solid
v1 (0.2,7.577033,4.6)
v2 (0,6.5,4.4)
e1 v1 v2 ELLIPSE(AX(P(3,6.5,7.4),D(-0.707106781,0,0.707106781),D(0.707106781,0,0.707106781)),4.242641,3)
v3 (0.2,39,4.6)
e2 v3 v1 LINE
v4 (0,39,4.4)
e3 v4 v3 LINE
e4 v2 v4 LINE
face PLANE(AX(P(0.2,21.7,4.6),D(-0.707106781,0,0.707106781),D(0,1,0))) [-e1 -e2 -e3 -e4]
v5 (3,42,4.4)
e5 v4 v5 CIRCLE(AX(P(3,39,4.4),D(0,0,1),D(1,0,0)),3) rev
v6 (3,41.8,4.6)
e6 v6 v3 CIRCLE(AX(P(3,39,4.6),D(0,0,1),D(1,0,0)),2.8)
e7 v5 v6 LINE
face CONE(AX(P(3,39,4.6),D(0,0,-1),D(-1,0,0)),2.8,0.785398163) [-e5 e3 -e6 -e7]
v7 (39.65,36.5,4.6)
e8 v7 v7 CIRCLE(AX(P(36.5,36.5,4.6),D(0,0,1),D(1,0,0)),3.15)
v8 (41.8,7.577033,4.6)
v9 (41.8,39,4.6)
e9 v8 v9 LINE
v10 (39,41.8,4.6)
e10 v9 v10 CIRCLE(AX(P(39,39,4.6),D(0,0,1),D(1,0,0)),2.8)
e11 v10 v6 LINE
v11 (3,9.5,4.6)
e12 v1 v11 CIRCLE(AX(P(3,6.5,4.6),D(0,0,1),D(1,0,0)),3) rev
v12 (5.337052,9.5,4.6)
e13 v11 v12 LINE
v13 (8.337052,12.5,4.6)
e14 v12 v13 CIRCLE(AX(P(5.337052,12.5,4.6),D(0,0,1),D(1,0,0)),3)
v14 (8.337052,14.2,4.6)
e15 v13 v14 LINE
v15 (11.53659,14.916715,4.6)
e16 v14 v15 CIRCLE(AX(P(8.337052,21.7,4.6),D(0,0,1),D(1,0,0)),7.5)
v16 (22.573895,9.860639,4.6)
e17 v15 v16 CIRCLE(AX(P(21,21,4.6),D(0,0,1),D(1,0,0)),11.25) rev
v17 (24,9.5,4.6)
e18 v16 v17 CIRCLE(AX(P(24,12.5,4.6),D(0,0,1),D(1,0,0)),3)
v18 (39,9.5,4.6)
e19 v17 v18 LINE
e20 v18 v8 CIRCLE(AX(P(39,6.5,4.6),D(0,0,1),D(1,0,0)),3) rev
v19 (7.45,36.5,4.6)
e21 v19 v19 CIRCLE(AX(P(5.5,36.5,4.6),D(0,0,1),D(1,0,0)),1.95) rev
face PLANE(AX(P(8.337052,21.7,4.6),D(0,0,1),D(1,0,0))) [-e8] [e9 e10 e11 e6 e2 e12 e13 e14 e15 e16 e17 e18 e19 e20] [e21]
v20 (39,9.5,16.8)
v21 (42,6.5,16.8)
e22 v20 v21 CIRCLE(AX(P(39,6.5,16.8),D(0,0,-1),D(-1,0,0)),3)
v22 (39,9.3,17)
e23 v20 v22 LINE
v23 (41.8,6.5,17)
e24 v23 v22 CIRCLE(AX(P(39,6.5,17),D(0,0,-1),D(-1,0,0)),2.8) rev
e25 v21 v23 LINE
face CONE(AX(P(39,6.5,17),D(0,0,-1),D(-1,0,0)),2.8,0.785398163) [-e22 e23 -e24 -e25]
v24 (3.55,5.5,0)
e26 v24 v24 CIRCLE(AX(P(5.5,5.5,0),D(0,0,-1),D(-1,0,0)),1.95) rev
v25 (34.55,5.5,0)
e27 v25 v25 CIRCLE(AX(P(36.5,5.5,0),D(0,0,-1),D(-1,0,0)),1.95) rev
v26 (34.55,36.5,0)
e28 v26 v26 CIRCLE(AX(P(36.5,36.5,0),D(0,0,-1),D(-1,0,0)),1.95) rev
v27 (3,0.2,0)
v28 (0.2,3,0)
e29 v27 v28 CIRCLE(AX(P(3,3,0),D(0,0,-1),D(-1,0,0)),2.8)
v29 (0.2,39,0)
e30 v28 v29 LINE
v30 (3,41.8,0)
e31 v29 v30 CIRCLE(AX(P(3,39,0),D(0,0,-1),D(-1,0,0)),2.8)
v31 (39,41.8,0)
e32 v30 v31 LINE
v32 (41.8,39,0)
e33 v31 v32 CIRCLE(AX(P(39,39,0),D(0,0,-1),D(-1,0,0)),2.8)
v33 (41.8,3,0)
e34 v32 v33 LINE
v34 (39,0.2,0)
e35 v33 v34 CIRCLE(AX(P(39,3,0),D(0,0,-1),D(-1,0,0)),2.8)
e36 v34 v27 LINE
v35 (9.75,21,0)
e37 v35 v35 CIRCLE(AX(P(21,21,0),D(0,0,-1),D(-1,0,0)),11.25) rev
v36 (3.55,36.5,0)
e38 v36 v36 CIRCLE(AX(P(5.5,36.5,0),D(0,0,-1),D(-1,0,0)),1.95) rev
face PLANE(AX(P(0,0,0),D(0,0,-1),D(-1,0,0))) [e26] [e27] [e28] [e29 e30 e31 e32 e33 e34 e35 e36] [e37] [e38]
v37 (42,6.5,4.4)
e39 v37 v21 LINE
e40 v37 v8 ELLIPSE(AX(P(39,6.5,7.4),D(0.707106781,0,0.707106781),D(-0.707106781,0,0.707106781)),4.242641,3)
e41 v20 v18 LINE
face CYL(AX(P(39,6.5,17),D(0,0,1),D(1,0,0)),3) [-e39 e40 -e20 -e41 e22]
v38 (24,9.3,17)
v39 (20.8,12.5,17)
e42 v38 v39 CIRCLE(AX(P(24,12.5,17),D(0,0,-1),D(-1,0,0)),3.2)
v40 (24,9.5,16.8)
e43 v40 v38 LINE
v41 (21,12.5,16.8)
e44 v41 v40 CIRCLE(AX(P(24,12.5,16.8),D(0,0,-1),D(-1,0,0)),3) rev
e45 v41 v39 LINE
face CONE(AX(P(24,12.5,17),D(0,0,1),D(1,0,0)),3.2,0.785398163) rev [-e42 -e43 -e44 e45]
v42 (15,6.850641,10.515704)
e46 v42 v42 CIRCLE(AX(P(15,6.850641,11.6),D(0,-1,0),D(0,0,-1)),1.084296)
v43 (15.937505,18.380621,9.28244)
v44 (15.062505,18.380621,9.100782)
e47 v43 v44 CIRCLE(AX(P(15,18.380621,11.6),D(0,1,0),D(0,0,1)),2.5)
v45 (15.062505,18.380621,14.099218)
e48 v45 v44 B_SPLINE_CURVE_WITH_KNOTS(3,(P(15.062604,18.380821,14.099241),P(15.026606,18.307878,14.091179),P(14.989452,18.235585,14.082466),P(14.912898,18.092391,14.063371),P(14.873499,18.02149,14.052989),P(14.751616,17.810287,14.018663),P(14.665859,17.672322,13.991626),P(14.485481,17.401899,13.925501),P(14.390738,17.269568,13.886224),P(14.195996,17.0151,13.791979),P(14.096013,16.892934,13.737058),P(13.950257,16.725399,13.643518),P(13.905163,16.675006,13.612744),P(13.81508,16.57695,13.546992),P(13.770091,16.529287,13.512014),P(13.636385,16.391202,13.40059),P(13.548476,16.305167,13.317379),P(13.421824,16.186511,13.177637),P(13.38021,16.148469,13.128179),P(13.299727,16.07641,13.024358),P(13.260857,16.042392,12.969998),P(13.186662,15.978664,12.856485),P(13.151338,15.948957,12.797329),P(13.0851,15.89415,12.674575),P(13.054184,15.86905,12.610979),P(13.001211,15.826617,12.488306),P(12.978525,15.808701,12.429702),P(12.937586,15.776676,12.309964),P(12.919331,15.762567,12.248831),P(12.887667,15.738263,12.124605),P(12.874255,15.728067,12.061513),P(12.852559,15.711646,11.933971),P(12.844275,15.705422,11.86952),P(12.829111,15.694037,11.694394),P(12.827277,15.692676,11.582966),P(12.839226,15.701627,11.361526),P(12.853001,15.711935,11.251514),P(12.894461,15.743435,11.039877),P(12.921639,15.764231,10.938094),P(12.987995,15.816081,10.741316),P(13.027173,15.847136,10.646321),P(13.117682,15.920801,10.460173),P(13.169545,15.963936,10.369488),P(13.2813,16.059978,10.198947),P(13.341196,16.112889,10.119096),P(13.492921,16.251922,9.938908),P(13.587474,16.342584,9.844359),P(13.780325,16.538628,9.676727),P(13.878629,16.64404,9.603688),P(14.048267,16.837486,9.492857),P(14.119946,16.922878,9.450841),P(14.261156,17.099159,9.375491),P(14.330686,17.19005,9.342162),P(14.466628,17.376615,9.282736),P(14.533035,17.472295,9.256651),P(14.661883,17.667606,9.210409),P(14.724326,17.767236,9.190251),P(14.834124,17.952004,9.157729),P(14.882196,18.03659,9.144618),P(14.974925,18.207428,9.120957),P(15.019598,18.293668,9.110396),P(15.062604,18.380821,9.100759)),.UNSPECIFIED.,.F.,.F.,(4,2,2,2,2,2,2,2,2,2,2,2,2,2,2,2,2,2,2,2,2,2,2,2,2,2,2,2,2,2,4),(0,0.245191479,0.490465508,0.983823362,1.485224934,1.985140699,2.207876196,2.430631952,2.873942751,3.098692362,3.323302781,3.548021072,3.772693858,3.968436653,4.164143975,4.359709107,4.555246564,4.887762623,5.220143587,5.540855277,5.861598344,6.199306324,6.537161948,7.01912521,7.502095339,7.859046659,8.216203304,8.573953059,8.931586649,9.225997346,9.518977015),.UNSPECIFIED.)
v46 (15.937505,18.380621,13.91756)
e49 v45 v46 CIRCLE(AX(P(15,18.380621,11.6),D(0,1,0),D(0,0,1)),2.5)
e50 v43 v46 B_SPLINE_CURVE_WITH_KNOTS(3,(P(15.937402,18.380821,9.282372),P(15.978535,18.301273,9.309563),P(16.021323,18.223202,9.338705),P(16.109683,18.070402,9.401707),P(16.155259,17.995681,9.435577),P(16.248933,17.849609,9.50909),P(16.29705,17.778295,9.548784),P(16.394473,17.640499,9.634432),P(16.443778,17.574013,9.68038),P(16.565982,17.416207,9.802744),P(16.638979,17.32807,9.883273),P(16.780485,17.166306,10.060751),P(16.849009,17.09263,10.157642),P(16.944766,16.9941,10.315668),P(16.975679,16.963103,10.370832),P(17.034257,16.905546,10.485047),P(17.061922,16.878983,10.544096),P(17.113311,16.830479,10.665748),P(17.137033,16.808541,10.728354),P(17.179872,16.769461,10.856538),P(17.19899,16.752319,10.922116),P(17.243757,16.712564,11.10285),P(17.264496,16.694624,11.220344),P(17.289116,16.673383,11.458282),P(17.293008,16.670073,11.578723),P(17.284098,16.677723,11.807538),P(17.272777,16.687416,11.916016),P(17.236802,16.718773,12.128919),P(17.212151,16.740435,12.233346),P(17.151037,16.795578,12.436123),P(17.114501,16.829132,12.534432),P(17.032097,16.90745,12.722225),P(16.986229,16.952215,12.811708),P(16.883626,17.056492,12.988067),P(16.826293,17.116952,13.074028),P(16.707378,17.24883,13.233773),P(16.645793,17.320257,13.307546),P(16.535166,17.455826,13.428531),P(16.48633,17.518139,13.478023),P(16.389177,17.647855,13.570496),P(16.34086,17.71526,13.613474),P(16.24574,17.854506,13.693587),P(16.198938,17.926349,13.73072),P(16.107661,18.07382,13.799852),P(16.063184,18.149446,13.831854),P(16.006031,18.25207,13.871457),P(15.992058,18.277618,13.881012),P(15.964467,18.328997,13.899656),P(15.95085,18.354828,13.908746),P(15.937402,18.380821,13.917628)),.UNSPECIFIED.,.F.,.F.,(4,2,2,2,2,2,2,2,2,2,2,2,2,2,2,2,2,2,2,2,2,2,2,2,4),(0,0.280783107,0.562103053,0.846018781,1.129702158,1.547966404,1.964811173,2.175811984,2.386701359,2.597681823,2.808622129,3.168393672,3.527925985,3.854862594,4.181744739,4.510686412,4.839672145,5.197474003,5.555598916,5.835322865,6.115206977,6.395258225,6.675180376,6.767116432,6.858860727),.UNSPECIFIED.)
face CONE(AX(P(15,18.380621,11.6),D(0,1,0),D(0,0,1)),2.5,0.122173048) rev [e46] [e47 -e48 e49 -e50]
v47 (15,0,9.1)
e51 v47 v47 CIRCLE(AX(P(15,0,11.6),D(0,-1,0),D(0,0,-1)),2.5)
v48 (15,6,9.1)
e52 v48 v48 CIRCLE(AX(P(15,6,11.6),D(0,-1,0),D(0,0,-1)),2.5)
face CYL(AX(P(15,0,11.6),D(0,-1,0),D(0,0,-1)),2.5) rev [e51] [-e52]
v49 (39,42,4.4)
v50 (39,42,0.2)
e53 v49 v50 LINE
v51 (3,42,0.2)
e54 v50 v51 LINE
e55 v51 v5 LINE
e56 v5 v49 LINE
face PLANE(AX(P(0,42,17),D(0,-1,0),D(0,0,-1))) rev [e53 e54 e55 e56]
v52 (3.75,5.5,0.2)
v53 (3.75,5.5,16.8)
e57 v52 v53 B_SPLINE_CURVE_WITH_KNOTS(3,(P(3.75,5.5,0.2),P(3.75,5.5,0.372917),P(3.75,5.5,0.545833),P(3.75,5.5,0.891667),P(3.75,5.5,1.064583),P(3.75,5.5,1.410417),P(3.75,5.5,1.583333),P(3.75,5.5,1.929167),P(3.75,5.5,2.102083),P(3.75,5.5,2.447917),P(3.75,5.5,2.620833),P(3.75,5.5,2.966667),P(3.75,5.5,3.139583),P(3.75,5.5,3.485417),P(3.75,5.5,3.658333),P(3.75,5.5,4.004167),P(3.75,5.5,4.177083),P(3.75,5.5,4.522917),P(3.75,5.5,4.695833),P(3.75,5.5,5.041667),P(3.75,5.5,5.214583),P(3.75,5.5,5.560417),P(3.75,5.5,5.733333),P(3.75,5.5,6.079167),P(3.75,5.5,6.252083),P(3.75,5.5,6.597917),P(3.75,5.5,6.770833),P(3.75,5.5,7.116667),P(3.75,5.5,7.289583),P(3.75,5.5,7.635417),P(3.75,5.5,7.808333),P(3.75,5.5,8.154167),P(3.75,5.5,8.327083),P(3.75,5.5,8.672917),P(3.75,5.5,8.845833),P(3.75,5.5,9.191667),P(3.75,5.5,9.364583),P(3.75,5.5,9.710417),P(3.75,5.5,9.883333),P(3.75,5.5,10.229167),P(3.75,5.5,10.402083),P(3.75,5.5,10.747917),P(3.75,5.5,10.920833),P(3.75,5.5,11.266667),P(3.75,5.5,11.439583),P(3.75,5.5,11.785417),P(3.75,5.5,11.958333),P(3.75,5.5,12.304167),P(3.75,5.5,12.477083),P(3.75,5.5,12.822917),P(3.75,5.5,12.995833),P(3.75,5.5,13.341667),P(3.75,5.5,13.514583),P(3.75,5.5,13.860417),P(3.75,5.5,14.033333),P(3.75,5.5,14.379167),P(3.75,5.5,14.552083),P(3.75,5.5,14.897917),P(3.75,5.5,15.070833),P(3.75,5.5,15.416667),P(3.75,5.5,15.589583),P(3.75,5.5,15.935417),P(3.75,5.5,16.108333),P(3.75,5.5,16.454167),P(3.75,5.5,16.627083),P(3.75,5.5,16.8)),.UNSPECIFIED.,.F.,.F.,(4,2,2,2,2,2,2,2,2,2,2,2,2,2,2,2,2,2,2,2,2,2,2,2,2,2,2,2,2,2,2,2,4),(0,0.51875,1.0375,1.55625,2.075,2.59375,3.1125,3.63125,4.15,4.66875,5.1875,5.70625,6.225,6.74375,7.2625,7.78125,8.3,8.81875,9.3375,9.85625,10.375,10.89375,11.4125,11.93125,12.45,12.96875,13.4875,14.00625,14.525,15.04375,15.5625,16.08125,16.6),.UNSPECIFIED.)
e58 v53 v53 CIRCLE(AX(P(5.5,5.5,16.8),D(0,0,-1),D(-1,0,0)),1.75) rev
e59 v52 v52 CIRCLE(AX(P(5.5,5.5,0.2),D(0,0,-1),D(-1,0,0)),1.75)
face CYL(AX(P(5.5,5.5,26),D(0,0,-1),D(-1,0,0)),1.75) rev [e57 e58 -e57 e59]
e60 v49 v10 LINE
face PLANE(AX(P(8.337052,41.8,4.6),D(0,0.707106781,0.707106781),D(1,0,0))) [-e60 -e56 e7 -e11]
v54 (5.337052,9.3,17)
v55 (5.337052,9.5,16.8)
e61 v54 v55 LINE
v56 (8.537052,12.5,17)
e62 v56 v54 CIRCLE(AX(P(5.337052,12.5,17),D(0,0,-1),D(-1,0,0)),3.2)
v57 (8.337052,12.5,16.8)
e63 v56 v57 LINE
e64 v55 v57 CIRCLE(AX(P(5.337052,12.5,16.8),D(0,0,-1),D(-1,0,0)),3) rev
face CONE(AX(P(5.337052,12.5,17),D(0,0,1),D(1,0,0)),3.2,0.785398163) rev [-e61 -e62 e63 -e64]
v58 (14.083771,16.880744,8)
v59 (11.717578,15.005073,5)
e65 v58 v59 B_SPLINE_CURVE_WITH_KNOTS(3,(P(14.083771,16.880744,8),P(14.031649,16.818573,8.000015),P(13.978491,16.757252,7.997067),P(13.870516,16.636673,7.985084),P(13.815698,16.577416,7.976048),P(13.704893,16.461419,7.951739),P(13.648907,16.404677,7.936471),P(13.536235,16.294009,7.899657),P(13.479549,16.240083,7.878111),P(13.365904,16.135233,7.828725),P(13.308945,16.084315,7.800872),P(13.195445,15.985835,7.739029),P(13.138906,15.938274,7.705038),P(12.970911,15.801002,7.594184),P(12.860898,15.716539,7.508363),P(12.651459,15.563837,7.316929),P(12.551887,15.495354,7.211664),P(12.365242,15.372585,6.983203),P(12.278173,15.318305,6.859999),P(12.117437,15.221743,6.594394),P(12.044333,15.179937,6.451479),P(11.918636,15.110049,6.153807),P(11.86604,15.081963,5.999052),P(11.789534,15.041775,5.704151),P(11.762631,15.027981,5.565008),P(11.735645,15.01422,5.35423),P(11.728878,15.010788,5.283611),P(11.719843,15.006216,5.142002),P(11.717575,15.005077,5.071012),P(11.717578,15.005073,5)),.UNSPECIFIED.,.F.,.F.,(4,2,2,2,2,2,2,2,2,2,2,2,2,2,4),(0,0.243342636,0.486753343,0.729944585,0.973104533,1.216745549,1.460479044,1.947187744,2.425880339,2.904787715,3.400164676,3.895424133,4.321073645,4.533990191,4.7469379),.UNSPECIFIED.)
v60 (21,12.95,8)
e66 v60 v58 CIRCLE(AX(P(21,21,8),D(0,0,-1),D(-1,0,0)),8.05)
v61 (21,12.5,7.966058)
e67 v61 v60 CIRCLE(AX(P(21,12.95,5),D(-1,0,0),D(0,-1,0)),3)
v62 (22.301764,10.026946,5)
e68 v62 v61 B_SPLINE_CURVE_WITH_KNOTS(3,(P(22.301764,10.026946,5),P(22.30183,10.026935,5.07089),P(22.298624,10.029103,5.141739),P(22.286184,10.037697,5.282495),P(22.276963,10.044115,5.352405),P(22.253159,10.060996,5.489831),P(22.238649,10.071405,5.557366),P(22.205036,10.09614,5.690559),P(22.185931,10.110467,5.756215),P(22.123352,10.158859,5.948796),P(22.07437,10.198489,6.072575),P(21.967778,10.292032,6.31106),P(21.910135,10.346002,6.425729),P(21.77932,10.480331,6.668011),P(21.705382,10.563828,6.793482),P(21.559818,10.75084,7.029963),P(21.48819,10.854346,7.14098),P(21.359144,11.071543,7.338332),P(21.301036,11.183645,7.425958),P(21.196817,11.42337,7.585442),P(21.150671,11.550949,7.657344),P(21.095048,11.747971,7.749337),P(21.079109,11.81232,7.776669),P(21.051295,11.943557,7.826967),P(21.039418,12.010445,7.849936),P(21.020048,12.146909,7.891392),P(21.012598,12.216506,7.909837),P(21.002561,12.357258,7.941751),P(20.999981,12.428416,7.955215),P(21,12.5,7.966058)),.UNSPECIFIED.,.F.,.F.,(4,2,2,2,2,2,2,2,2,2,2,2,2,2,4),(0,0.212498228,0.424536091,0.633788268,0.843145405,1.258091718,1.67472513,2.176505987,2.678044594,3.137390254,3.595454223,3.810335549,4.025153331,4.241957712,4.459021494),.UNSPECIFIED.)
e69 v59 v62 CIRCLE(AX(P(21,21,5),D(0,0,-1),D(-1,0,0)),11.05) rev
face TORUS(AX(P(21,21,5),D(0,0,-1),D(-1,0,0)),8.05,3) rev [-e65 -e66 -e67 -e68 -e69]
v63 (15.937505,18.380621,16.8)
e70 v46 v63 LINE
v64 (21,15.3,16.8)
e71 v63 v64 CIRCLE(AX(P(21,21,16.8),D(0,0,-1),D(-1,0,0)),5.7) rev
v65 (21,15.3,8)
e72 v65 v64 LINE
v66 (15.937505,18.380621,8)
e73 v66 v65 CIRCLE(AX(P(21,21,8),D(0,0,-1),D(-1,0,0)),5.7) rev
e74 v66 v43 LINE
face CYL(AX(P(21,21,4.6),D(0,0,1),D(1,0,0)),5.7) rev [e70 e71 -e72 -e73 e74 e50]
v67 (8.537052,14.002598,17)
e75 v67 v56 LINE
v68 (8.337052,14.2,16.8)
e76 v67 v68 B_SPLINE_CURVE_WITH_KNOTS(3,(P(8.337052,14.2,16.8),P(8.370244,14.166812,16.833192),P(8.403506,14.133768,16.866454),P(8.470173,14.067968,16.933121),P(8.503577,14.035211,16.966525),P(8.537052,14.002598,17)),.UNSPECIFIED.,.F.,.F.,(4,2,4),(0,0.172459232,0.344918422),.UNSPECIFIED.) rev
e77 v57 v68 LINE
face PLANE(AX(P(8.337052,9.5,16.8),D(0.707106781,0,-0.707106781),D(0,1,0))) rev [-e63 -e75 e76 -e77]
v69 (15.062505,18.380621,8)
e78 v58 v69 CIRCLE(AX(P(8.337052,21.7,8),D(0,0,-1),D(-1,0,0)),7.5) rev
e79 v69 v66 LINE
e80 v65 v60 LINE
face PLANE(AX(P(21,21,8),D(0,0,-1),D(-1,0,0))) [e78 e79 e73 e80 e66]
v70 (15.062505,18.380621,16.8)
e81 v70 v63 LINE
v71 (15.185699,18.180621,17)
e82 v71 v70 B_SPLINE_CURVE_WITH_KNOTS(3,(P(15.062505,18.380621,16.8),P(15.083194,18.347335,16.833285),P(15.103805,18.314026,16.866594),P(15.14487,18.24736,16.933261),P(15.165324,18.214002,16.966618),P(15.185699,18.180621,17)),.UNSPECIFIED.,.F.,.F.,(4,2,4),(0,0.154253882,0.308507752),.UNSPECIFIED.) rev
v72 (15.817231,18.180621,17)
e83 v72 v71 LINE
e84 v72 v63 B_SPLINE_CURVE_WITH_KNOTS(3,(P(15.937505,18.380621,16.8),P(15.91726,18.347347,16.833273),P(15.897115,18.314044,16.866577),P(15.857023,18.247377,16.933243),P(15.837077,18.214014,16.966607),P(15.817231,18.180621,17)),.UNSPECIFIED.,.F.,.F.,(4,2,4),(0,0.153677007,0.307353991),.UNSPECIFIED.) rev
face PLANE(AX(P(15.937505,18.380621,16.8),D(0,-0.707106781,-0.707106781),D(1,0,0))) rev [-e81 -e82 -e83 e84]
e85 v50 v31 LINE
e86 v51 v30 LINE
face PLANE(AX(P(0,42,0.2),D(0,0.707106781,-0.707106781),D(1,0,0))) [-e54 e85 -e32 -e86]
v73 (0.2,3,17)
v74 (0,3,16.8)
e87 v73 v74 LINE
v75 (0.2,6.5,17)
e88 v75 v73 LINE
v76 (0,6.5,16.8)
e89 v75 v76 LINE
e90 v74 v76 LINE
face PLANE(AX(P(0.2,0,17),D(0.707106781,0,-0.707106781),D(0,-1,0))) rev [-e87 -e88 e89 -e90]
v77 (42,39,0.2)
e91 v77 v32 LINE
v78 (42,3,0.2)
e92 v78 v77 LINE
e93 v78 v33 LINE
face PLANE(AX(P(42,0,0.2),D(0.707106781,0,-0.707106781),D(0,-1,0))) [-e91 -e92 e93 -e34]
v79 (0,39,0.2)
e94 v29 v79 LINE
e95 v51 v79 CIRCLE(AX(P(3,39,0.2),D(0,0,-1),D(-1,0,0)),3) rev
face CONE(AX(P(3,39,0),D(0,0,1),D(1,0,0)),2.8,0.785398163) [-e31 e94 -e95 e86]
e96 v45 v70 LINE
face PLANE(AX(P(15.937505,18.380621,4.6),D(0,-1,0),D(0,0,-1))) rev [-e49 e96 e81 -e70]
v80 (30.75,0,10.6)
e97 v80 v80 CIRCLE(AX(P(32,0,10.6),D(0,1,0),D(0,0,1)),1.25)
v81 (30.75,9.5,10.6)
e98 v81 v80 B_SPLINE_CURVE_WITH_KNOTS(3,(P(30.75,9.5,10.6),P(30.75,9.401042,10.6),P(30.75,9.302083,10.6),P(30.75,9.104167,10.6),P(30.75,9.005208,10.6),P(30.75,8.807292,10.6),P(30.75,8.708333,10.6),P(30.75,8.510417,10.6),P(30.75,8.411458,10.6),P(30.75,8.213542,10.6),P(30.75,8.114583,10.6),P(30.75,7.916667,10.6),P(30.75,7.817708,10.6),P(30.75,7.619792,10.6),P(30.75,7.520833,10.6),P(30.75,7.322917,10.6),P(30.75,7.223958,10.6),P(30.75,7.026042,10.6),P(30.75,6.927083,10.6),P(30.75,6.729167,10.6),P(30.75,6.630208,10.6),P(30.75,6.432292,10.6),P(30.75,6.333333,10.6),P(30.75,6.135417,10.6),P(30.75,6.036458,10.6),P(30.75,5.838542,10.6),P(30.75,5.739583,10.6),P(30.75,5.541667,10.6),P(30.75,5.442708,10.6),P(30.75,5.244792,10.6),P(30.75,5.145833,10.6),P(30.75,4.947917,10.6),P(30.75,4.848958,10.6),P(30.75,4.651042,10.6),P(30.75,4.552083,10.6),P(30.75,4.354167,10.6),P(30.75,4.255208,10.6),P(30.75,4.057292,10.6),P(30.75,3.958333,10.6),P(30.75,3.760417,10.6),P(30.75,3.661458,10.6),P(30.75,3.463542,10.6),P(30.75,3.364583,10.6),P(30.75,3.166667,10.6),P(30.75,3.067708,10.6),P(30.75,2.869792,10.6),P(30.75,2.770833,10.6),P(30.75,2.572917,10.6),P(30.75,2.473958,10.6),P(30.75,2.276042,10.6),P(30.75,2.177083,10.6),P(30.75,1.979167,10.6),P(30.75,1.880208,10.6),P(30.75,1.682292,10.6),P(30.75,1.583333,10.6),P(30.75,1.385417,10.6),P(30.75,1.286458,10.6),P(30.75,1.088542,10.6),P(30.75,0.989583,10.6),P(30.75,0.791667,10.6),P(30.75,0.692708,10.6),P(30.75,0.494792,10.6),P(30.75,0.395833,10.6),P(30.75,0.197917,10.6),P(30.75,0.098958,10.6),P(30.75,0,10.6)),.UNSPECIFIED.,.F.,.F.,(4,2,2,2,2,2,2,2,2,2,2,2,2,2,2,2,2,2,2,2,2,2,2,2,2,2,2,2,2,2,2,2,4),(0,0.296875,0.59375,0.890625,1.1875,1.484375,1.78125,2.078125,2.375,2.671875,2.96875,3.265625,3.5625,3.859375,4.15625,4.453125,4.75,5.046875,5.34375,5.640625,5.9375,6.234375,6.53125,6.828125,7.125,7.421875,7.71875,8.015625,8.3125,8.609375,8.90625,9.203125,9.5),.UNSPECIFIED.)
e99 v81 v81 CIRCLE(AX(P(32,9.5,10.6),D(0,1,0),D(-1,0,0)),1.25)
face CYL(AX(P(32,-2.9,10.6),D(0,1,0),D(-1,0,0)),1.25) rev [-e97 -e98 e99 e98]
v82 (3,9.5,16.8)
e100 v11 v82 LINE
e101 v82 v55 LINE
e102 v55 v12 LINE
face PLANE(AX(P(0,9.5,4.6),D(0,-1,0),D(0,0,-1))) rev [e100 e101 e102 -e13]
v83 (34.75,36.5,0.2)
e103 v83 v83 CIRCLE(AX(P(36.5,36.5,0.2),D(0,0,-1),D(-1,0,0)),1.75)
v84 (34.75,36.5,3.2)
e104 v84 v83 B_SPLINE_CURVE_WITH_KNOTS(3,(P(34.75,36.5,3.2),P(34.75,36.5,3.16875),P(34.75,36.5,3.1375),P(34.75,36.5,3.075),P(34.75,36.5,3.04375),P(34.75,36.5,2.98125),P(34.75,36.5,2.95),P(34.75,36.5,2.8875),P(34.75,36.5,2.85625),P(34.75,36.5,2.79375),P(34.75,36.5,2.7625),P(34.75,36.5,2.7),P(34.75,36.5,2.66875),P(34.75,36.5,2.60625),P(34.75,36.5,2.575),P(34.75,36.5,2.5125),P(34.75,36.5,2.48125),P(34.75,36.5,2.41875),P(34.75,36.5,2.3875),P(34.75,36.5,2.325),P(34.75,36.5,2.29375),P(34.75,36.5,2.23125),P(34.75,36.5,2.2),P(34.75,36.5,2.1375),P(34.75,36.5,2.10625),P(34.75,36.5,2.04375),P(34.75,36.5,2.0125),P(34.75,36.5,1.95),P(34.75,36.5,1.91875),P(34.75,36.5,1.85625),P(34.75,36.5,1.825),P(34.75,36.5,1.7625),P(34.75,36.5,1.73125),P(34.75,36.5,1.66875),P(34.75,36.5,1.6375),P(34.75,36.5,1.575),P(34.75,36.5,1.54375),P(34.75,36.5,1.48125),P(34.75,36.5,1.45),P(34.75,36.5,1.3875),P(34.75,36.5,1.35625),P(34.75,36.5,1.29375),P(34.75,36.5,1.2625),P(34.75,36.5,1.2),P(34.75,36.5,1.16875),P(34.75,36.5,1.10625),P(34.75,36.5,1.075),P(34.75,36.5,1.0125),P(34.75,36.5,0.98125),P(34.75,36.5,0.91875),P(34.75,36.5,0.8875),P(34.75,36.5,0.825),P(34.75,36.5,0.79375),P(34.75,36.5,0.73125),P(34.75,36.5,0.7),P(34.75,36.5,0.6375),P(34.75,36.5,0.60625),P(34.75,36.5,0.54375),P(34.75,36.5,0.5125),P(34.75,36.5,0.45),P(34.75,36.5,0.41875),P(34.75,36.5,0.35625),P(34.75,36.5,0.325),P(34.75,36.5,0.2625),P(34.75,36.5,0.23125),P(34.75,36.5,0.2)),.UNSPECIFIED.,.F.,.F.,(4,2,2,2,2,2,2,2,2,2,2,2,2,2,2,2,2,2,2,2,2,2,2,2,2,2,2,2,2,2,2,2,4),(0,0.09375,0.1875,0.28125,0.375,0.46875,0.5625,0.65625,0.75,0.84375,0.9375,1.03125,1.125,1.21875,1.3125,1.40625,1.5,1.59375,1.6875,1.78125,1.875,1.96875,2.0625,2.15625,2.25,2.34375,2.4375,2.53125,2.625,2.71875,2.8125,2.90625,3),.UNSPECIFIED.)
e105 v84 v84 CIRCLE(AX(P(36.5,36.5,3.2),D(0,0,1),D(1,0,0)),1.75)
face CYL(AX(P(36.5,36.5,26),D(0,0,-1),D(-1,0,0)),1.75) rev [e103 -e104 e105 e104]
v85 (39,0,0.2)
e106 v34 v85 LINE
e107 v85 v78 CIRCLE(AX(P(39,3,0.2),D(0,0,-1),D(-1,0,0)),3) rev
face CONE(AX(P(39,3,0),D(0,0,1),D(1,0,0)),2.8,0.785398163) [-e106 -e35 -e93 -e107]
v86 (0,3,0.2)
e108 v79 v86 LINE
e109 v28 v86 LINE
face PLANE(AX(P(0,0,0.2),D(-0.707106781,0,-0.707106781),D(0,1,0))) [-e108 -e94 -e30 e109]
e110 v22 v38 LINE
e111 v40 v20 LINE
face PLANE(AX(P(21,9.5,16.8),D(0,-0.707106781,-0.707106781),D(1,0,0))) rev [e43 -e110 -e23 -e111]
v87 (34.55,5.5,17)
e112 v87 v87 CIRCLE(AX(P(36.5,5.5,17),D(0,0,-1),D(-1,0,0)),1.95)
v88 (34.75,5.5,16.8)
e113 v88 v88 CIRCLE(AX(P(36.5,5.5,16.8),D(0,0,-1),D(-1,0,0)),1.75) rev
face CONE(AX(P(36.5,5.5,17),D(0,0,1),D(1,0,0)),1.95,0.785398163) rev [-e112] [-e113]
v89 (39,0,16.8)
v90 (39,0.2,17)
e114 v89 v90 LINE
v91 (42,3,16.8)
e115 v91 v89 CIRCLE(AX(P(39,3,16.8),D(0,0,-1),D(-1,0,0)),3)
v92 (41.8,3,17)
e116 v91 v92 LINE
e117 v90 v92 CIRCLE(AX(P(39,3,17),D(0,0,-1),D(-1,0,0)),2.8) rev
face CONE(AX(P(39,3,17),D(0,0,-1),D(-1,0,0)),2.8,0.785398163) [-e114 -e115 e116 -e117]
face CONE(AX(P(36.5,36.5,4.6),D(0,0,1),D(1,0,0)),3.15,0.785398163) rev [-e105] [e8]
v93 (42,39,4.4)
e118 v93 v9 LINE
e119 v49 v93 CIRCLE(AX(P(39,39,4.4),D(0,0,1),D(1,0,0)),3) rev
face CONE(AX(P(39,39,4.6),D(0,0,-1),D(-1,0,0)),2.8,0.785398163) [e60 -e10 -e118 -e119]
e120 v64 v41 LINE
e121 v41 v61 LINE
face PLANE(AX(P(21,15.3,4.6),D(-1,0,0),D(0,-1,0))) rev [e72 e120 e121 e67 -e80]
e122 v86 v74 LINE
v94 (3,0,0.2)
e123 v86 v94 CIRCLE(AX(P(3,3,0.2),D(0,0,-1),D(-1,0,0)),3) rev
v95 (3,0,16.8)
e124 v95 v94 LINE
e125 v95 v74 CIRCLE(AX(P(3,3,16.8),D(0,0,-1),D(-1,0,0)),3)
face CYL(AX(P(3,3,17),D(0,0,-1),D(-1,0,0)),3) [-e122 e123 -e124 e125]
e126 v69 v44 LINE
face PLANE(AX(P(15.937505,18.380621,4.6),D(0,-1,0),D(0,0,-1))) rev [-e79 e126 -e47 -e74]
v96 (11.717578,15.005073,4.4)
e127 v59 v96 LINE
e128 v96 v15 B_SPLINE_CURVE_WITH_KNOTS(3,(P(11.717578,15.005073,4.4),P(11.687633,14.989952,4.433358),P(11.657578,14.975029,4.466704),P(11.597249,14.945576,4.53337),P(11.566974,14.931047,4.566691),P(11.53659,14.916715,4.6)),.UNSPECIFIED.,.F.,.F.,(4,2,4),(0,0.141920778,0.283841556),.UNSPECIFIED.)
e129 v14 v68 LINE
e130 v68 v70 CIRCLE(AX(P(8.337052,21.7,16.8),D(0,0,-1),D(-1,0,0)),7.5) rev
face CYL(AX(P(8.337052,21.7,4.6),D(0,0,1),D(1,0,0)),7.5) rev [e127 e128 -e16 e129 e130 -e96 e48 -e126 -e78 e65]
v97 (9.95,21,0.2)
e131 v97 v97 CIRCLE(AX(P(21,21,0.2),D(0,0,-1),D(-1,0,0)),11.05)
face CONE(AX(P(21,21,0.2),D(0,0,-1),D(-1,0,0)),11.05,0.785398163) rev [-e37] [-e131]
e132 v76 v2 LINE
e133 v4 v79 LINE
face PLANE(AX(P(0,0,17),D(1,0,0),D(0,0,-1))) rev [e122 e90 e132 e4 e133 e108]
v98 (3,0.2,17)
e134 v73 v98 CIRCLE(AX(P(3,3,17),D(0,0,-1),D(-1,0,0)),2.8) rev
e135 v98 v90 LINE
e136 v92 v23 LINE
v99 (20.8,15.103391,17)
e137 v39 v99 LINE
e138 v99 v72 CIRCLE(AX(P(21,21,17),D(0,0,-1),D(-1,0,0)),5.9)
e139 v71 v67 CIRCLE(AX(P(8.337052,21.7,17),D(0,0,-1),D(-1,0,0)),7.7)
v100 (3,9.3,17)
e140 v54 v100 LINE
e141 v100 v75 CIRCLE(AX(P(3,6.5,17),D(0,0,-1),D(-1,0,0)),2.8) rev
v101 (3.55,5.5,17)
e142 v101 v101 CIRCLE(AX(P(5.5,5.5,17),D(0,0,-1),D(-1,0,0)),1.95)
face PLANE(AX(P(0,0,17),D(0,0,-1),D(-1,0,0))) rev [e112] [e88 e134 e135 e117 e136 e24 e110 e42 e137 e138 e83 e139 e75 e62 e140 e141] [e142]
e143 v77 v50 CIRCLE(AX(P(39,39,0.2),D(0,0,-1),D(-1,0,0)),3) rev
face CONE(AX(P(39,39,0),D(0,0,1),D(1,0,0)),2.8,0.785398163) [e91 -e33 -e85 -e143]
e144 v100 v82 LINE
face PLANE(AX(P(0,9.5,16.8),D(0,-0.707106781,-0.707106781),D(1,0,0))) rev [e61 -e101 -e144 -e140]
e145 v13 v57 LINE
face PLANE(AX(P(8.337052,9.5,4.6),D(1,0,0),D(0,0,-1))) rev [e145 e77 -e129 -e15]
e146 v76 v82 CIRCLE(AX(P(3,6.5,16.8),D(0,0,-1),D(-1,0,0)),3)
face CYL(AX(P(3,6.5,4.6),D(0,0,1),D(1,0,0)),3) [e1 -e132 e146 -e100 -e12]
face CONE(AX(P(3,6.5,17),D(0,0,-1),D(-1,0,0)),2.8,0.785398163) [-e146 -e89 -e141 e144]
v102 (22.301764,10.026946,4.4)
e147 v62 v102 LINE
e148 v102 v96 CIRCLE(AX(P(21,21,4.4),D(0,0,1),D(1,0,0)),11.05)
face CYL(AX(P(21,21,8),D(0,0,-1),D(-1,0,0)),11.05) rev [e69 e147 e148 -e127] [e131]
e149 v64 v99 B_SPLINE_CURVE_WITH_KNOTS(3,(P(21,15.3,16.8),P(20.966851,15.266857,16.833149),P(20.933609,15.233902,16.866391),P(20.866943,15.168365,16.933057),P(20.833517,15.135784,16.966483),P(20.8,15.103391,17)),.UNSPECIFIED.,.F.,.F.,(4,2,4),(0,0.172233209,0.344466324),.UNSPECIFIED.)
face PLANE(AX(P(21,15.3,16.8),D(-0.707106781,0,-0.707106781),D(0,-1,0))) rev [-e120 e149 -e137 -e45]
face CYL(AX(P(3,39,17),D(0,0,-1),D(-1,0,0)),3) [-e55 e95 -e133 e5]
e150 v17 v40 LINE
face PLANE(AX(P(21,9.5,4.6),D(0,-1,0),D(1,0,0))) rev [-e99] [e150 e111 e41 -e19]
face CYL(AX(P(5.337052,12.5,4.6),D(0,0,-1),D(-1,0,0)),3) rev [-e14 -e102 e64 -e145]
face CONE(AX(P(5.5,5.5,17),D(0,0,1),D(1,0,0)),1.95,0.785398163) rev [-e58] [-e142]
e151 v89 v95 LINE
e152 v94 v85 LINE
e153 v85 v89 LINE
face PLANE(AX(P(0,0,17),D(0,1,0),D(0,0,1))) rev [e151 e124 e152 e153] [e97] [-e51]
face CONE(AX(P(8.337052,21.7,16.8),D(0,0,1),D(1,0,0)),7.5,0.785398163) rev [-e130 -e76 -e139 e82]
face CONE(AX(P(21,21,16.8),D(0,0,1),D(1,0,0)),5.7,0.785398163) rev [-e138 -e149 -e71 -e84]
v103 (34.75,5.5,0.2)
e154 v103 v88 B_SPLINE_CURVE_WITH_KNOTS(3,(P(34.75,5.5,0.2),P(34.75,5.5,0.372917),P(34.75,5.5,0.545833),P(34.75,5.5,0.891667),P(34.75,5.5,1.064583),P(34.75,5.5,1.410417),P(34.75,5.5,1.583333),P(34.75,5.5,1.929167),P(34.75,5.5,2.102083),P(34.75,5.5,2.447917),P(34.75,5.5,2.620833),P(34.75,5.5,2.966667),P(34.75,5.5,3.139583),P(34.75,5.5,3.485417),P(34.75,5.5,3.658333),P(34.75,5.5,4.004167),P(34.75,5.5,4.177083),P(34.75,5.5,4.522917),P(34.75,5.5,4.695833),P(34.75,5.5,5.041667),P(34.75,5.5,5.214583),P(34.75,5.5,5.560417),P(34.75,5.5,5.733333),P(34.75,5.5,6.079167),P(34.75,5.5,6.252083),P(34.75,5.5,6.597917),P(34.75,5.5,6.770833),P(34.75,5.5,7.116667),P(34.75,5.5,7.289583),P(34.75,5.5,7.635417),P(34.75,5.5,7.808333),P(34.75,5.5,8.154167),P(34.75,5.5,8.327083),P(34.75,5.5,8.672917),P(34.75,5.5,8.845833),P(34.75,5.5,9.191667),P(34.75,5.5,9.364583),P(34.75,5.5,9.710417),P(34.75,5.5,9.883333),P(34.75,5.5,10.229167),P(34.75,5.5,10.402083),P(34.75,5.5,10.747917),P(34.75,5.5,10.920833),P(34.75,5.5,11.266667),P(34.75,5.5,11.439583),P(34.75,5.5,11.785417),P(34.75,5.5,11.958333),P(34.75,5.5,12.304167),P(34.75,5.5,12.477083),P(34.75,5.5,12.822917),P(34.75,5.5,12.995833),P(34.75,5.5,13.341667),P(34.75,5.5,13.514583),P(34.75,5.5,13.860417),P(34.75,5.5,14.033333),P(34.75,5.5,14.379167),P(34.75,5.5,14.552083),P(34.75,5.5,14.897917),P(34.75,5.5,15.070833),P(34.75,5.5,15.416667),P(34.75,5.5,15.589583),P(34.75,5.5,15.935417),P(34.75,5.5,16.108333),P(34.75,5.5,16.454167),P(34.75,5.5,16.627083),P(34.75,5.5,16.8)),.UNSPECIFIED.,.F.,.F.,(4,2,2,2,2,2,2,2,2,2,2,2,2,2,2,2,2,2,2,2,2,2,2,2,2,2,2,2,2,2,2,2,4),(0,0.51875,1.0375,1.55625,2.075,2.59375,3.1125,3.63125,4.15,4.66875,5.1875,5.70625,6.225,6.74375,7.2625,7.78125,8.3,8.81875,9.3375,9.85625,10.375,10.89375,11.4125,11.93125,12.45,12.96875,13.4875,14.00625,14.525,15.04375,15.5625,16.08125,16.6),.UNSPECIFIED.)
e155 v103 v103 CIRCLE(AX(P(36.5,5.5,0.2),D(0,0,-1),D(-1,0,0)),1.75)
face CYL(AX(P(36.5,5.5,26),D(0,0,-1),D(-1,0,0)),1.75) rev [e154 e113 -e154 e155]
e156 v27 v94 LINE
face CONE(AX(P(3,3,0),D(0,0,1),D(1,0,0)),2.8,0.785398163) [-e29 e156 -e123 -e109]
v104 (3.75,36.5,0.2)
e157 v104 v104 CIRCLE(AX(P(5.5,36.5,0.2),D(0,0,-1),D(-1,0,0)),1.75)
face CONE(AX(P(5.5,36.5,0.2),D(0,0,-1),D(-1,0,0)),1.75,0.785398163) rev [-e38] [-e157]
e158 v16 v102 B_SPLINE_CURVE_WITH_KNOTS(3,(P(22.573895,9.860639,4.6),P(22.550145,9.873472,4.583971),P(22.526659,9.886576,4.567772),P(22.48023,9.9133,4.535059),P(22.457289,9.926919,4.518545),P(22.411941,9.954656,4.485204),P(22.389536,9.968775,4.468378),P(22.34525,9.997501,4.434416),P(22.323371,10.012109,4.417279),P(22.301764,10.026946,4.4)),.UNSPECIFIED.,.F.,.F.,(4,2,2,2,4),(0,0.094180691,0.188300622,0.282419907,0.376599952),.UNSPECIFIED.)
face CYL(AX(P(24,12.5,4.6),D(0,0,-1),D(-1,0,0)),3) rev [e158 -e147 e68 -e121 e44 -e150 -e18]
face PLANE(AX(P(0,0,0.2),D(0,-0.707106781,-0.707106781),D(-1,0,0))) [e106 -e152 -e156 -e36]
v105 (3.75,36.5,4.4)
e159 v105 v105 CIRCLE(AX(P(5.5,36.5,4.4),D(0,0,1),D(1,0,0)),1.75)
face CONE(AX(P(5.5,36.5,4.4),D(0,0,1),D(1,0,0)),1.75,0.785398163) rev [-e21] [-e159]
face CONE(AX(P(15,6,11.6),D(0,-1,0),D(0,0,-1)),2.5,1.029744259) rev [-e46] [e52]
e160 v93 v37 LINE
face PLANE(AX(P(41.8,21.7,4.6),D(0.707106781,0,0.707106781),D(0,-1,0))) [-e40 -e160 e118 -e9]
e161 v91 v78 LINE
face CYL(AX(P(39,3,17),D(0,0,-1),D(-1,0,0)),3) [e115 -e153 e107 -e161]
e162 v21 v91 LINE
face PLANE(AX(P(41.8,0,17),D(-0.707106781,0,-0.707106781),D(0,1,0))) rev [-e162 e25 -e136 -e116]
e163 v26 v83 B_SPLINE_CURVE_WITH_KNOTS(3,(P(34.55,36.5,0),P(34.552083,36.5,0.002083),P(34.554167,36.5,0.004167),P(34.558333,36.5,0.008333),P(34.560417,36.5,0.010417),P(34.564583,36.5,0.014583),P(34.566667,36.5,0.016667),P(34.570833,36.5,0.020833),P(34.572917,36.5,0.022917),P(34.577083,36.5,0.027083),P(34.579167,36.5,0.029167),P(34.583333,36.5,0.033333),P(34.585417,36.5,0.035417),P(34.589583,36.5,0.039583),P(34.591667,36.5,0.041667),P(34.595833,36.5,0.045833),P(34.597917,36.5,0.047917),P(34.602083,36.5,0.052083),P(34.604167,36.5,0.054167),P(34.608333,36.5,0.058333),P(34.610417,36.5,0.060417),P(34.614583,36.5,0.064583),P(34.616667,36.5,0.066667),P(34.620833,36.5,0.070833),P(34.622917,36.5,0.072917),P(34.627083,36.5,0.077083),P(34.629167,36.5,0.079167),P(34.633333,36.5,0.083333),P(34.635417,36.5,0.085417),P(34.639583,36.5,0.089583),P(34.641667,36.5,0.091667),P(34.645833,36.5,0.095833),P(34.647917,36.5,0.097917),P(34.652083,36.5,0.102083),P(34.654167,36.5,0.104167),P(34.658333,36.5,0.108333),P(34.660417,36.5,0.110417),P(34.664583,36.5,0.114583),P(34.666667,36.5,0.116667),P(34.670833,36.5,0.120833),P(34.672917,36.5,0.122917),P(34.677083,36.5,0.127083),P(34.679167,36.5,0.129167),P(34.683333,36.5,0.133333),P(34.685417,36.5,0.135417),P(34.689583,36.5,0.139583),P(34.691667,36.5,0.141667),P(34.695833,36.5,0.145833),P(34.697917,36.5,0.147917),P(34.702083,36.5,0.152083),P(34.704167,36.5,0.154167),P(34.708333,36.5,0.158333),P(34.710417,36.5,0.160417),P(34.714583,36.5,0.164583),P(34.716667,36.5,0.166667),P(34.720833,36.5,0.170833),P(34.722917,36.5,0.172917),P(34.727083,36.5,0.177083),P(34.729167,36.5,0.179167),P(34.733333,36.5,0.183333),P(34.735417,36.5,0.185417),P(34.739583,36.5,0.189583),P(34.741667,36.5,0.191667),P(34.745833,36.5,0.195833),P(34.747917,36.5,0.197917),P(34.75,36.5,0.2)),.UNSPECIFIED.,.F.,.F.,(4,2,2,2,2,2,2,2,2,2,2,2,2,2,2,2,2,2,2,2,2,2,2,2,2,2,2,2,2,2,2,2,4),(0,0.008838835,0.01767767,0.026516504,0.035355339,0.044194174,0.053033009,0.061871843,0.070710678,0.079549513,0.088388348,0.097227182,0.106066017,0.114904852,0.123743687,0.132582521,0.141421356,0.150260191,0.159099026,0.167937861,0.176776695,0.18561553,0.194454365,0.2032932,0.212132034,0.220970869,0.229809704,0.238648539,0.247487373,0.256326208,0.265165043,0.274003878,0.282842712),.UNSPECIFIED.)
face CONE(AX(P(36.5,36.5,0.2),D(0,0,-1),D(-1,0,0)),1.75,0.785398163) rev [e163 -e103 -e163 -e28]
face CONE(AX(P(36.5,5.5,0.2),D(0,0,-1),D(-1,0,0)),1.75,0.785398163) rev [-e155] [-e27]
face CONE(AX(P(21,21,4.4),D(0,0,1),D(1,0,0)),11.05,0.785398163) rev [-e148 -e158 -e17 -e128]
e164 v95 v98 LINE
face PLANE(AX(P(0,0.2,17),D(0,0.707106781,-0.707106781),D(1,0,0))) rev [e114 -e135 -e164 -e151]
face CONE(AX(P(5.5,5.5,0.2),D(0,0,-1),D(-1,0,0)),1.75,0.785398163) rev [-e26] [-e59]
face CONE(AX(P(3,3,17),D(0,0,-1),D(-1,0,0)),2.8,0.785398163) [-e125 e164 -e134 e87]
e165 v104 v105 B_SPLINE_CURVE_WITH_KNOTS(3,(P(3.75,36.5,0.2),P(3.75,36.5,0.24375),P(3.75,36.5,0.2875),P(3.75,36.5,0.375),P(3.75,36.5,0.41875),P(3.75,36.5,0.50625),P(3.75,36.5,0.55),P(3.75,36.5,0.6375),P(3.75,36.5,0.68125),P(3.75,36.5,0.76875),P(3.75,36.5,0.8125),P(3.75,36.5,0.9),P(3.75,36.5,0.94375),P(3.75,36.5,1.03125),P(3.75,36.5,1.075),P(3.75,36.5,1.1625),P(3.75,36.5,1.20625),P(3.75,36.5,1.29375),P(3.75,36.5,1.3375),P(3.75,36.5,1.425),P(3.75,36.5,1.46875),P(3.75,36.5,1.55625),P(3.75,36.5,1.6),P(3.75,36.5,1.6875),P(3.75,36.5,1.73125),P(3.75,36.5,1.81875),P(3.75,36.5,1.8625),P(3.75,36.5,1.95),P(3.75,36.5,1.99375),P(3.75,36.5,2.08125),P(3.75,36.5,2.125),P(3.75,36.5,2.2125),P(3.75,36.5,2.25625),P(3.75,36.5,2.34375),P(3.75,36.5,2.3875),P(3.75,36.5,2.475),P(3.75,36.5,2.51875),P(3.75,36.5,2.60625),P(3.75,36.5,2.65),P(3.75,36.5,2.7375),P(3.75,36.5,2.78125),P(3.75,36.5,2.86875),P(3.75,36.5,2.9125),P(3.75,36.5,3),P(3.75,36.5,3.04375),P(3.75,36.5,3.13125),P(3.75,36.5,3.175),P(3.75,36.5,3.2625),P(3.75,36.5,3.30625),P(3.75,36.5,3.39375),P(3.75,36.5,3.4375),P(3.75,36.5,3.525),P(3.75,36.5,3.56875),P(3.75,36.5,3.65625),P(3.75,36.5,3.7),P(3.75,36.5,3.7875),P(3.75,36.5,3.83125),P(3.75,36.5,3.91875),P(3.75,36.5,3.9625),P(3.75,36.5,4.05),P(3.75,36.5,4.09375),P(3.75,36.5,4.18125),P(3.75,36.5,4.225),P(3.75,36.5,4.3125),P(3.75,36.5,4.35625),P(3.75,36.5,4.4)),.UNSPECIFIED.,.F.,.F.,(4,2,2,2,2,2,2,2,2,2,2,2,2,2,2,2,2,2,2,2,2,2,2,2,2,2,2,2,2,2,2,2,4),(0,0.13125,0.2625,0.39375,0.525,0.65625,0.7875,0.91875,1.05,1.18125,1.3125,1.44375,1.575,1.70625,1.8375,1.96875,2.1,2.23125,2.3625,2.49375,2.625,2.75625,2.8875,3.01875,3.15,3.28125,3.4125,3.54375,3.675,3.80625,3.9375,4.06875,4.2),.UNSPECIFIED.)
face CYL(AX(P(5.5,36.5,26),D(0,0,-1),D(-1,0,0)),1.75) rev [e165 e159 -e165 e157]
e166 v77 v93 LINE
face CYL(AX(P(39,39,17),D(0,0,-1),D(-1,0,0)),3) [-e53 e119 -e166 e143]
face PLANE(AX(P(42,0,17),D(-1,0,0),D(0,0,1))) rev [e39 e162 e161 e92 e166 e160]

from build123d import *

# Parameters (mm, degrees)
SKETCH_1_W                                      = 42
SKETCH_1_H                                      = 42
EXTRUDE_1_DEPTH                                 = 17
CUT_EXTRUDE_1_DEPTH                             = 12.4
SKETCH_3_R                                      = 11.05
CUT_EXTRUDE_2_DEPTH                             = 8
SKETCH_5_R                                      = 1.2499999999999978
CUT_EXTRUDE_4_DEPTH                             = 12.4
FILLET_1_R                                      = 3
CHAMFER_1_SIZE                                  = 0.2
CHAMFER_2_SIZE                                  = 0.2
CHAMFER_3_SIZE                                  = 0.2
SKETCH_6_R                                      = 1.7500000000000004
SKETCH_6_R_2                                    = 1.7500000000000038
SKETCH_6_R_3                                    = 1.7499999999998814
SKETCH_6_R_4                                    = 1.7500000000000036
CUT_EXTRUDE_5_DEPTH                             = 26.00000000000001
CHAMFER_4_SIZE                                  = 0.2
FILETE2_R                                       = 3
CSK_FOR_M3_FLAT_HEAD_MACHINE_SCREW1_D           = 3.2
CSK_FOR_M3_FLAT_HEAD_MACHINE_SCREW1_CSINK_D     = 6.3
CSK_FOR_M3_FLAT_HEAD_MACHINE_SCREW1_CSINK_ANGLE = 90
TAP_DRILL_FOR_M6_TAP2_D                         = 5
TAP_DRILL_FOR_M6_TAP2_DEPTH                     = 6
TAP_DRILL_FOR_M6_TAP2_TIP                       = 1.5021515475689007


with BuildPart() as part:
    # Эскиз1 → Бобышка-Вытянуть1 (new body)
    with BuildSketch(Plane.XY):
        with Locations((21, 21)):
            Rectangle(SKETCH_1_W, SKETCH_1_H)
    extrude(amount=EXTRUDE_1_DEPTH)

    # Эскиз2 → Вырез-Вытянуть1 (cut)
    with BuildSketch(Plane.XY.offset(17)):
        with BuildLine():
            Line((0, 42), (42, 42))
            Line((42, 42), (42, 9.5))
            Line((42, 9.5), (21, 9.500000000000002))
            Line((21, 9.500000000000002), (21.00000000000009, 15.300000000000002))
            ThreePointArc((21.00000000000009, 15.300000000000002), (18.03693259362455, 16.130684694407922), (15.937505447941907, 18.380620510430074))
            Line((15.937505447941907, 18.380620510430074), (15.062505447941906, 18.380620510430074))
            ThreePointArc((15.062505447941906, 18.380620510430074), (12.29651275010685, 15.330331791538338), (8.337052317912484, 14.200000000000001))
            Line((8.337052317912484, 14.200000000000001), (8.337052317912484, 9.500000000000002))
            Line((8.337052317912484, 9.500000000000002), (3.98e-15, 9.500000000000002))
            Line((3.98e-15, 9.500000000000002), (0, 42))
        make_face()
    extrude(amount=-CUT_EXTRUDE_1_DEPTH, mode=Mode.SUBTRACT)

    # Эскиз3 → Вырез-Вытянуть2 (cut)
    with BuildSketch(Plane(origin=(0, 0, 0), x_dir=(-1, 0, 0), z_dir=(0, 0, -1))):
        with Locations((-21.000000000000007, 21.000000000000007)):
            Circle(SKETCH_3_R)
    extrude(amount=-CUT_EXTRUDE_2_DEPTH, mode=Mode.SUBTRACT)

    # Вырез-Вытянуть3 cone 1 section (through the dimple's axis) → Вырез-Вытянуть3 (revolve, cut)
    with BuildSketch(Plane(origin=(15, 18.38062051, 11.6), x_dir=(0, 0, 1), z_dir=(1, 0, 0))):
        Polygon((0, 0), (2.5, 0), (0, 20.36086607), align=None)
    revolve(axis=Axis((15, 18.38062051, 11.6), (0, -1, 0)), mode=Mode.SUBTRACT)

    # Эскиз5 → Вырез-Вытянуть4 (cut)
    with BuildSketch(Plane(origin=(0, 9.500000000000002, 0), x_dir=(1, -4e-17, 0), z_dir=(4e-17, 1, 0))):
        with Locations(Location((32.000000000000156, -10.600000000000055, 0), (0, 0, 180))):
            Circle(SKETCH_5_R)
    extrude(amount=-CUT_EXTRUDE_4_DEPTH, mode=Mode.SUBTRACT)

    # Скругление1
    # the kernel refuses this fillet: 3 mm, written as the material it adds along each edge
    with BuildSketch(Plane(origin=(21, 9.500000000000002, 17), x_dir=(1.54e-14, 1, 0), z_dir=(0, 0, -1))) as fillet_1_piece_1_section:
        with BuildLine():
            CenterArc((FILLET_1_R, FILLET_1_R), FILLET_1_R, 179.99999999999915, 90.00000000000085)
            Line((4.619e-14, FILLET_1_R), (0, 0))
            Line((0, 0), (FILLET_1_R, 0))
        make_face()
    fillet_1_piece_1 = extrude(amount=19.90000000000012, mode=Mode.PRIVATE)
    fillet_1_piece_1 = split(fillet_1_piece_1, bisect_by=Plane(origin=(21.37770329651456, 10.574866631857306, 8), z_dir=(0, 0, 1)), keep=Keep.TOP, mode=Mode.PRIVATE)
    add(fillet_1_piece_1)
    with BuildSketch(Plane(origin=(21, 9.500000000000002, 24.50000000000012), x_dir=(1.54e-14, 1, 0), z_dir=(0, 0, -1))) as fillet_1_piece_2_section:
        with BuildLine():
            CenterArc((FILLET_1_R, FILLET_1_R), FILLET_1_R, 179.99999999999915, 90.00000000000085)
            Line((4.619e-14, FILLET_1_R), (0, 0))
            Line((0, 0), (FILLET_1_R, 0))
        make_face()
    fillet_1_piece_2 = extrude(amount=19.90000000000012, mode=Mode.PRIVATE)
    fillet_1_piece_2 = fillet_1_piece_2 - Plane(origin=(21.000000000000007, 21.000000000000007, 6.3), x_dir=(-1, 0, 0), z_dir=(0, 0, -1)) * Cylinder(11.05, 52, mode=Mode.PRIVATE)
    fillet_1_piece_2 = split(fillet_1_piece_2, bisect_by=Plane(origin=(22.000979850131504, 9.712080299946667, 8), z_dir=(0, 0, -1)), keep=Keep.TOP, mode=Mode.PRIVATE)
    add(fillet_1_piece_2)
    with BuildSketch(Plane(origin=(8.337052317912484, 9.500000000000002, 17), x_dir=(-1, 0, 0), z_dir=(0, 0, -1))) as fillet_1_piece_3:
        with BuildLine():
            CenterArc((FILLET_1_R, FILLET_1_R), FILLET_1_R, 180, 90)
            Line((0, FILLET_1_R), (0, 0))
            Line((0, 0), (FILLET_1_R, 0))
        make_face()
    extrude(amount=12.4)
    # the kernel refuses this fillet: 3 mm, written as the material it takes off along each edge
    with BuildSketch(Plane(origin=(42, 42, -7.5), x_dir=(-1, 0, 0), z_dir=(0, 0, 1))) as fillet_1_2_piece_1:
        with BuildLine():
            CenterArc((FILLET_1_R, FILLET_1_R), FILLET_1_R, 180, 90)
            Line((0, FILLET_1_R), (0, 0))
            Line((0, 0), (FILLET_1_R, 0))
        make_face()
    extrude(amount=19.6, mode=Mode.SUBTRACT)
    with BuildSketch(Plane(origin=(0, 42, -7.5), x_dir=(1, 0, 0), z_dir=(0, 0, 1))) as fillet_1_2_piece_2:
        with BuildLine():
            CenterArc((FILLET_1_R, -FILLET_1_R), FILLET_1_R, 90, 90)
            Line((0, -FILLET_1_R), (0, 0))
            Line((0, 0), (FILLET_1_R, 0))
        make_face()
    extrude(amount=19.6, mode=Mode.SUBTRACT)
    with BuildSketch(Plane(origin=(42, 0, -7.5), x_dir=(-1, 0, 0), z_dir=(0, 0, 1))) as fillet_1_2_piece_3:
        with BuildLine():
            CenterArc((FILLET_1_R, -FILLET_1_R), FILLET_1_R, 90, 90)
            Line((0, -FILLET_1_R), (0, 0))
            Line((0, 0), (FILLET_1_R, 0))
        make_face()
    extrude(amount=32, mode=Mode.SUBTRACT)
    with BuildSketch(Plane(origin=(0, 0, -7.5), x_dir=(1, 0, 0), z_dir=(0, 0, 1))) as fillet_1_2_piece_4:
        with BuildLine():
            CenterArc((FILLET_1_R, FILLET_1_R), FILLET_1_R, 180, 90)
            Line((-4.4e-16, FILLET_1_R), (0, 0))
            Line((0, 0), (FILLET_1_R, 0))
        make_face()
    extrude(amount=32, mode=Mode.SUBTRACT)
    with BuildSketch(Plane(origin=(0, 9.500000000000002, 24.5), x_dir=(1, 0, 0), z_dir=(0, 0, -1))) as fillet_1_2_piece_5:
        with BuildLine():
            CenterArc((FILLET_1_R, FILLET_1_R), FILLET_1_R, 179.99999999999997, 90)
            Line((0, FILLET_1_R), (0, 0))
            Line((0, 0), (FILLET_1_R, 0))
        make_face()
    extrude(amount=19.900000000000006, mode=Mode.SUBTRACT)
    with BuildSketch(Plane(origin=(42, 9.5, 24.5), x_dir=(-1, 0, 0), z_dir=(0, 0, -1))) as fillet_1_2_piece_6:
        with BuildLine():
            CenterArc((FILLET_1_R, -FILLET_1_R), FILLET_1_R, 90, 90)
            Line((0, -FILLET_1_R), (0, 0))
            Line((0, 0), (FILLET_1_R, 0))
        make_face()
    extrude(amount=19.9, mode=Mode.SUBTRACT)

    # Фаска1
    chamfer_1_edges = [part.edges().sort_by_distance(p)[0] for p in [
        (32.05000000000001, 21.000000000000007, 0),
        (21, 42, 0),
        (0, 21, 0),
        (42, 21, 0),
        (21, 0, 0),
        (0.8786796564403576, 0.8786796564403572, 0),
        (41.121320343559645, 0.8786796564403576, 0),
        (0.8786796564403572, 41.121320343559645, 0),
        (41.121320343559645, 41.121320343559645, 0),
    ]]
    chamfer(chamfer_1_edges, length=CHAMFER_1_SIZE)

    # Фаска2
    chamfer_2_edges = [part.edges().sort_by_distance(p)[0] for p in [
        (42, 22.75, 4.6000000000000005),
        (12.296512750106848, 15.330331791538338, 17),
        (15.500005447941906, 18.380620510430074, 17),
        (18.036932593624567, 16.13068469440791, 17),
        (21.000000000000068, 13.900000000000002, 17),
        (31.500000000000014, 9.5, 17),
        (21, 42, 4.6),
        (9e-17, 22.75, 4.6000000000000005),
        (0.8786796564403572, 41.121320343559645, 4.6),
        (41.121320343559645, 41.121320343559645, 4.6),
        (8.337052317912484, 13.350000000000001, 17),
        (4.168526158956, 9.500000000000002, 17),
        (42, 4.75, 17),
        (0, 4.75, 17),
        (21, 0, 17),
        (0.8786796564403576, 8.621320343559642, 17),
        (0.8786796564403576, 0.8786796564403572, 17),
        (41.121320343559645, 8.621320343559642, 17),
        (41.121320343559645, 0.8786796564403576, 17),
        (21.878679656440376, 10.378679656440339, 17),
        (7.4583726614716435, 10.378679656440358, 17),
    ]]
    chamfer(chamfer_2_edges, length=CHAMFER_2_SIZE)

    # Фаска3
    chamfer_3_edges = [part.edges().sort_by_distance(p)[0] for p in [
        (28.33886931397383, 29.260962243734895, 4.6),
    ]]
    chamfer(chamfer_3_edges, length=CHAMFER_3_SIZE)

    # Эскиз6 → Вырез-Вытянуть5 (cut)
    with BuildSketch(Plane(origin=(0, 0, 0), x_dir=(-1, 0, 0), z_dir=(0, 0, -1))):
        with Locations((-5.50000000000014, 36.50000000000002)):
            Circle(SKETCH_6_R)
        with Locations((-36.50000000000014, 36.50000000000001)):
            Circle(SKETCH_6_R_2)
        with Locations((-5.500000000000008, 5.5000000000000115)):
            Circle(SKETCH_6_R_3)
        with Locations((-36.50000000000013, 5.500000000000008)):
            Circle(SKETCH_6_R_4)
    extrude(amount=-CUT_EXTRUDE_5_DEPTH, mode=Mode.SUBTRACT)

    # Фаска4
    chamfer_4_edges = [part.edges().sort_by_distance(p)[0] for p in [
        (7.25000000000014, 36.50000000000002, 4.6),
        (7.25000000000014, 36.50000000000002, 0),
        (38.25000000000015, 36.50000000000001, 4.6),
        (38.25000000000015, 36.50000000000001, 0),
        (7.24999999999989, 5.5000000000000115, 17),
        (7.24999999999989, 5.5000000000000115, 0),
        (38.25000000000013, 5.500000000000008, 17),
        (38.25000000000013, 5.500000000000008, 0),
    ]]
    chamfer(chamfer_4_edges, length=CHAMFER_4_SIZE)

    # Filete2
    filete2_edges = [part.edges().sort_by_distance(p)[0] for p in [
        (16.297005113109307, 11.000783075966405, 8),
    ]]
    fillet(filete2_edges, radius=FILETE2_R)

    # CSK for M3 Flat Head Machine Screw1 (through all)
    with Locations(Plane.XY.offset(4.600000000000001)):
        with Locations((36.5, 36.5)):
            CounterSinkHole(CSK_FOR_M3_FLAT_HEAD_MACHINE_SCREW1_D / 2, CSK_FOR_M3_FLAT_HEAD_MACHINE_SCREW1_CSINK_D / 2, counter_sink_angle=CSK_FOR_M3_FLAT_HEAD_MACHINE_SCREW1_CSINK_ANGLE)

    # Tap Drill for M6 Tap2
    with Locations(Plane(origin=(0, 0, 0), x_dir=(-1, 0, 0), z_dir=(0, -1, 0))):
        with Locations((-15, -11.6)):
            Hole(TAP_DRILL_FOR_M6_TAP2_D / 2, depth=TAP_DRILL_FOR_M6_TAP2_DEPTH)
            with Locations((0, 0, -(TAP_DRILL_FOR_M6_TAP2_DEPTH + TAP_DRILL_FOR_M6_TAP2_TIP / 2))):  # 118° drill point
                Cone(0, TAP_DRILL_FOR_M6_TAP2_D / 2, TAP_DRILL_FOR_M6_TAP2_TIP, mode=Mode.SUBTRACT)


solid = part.part
